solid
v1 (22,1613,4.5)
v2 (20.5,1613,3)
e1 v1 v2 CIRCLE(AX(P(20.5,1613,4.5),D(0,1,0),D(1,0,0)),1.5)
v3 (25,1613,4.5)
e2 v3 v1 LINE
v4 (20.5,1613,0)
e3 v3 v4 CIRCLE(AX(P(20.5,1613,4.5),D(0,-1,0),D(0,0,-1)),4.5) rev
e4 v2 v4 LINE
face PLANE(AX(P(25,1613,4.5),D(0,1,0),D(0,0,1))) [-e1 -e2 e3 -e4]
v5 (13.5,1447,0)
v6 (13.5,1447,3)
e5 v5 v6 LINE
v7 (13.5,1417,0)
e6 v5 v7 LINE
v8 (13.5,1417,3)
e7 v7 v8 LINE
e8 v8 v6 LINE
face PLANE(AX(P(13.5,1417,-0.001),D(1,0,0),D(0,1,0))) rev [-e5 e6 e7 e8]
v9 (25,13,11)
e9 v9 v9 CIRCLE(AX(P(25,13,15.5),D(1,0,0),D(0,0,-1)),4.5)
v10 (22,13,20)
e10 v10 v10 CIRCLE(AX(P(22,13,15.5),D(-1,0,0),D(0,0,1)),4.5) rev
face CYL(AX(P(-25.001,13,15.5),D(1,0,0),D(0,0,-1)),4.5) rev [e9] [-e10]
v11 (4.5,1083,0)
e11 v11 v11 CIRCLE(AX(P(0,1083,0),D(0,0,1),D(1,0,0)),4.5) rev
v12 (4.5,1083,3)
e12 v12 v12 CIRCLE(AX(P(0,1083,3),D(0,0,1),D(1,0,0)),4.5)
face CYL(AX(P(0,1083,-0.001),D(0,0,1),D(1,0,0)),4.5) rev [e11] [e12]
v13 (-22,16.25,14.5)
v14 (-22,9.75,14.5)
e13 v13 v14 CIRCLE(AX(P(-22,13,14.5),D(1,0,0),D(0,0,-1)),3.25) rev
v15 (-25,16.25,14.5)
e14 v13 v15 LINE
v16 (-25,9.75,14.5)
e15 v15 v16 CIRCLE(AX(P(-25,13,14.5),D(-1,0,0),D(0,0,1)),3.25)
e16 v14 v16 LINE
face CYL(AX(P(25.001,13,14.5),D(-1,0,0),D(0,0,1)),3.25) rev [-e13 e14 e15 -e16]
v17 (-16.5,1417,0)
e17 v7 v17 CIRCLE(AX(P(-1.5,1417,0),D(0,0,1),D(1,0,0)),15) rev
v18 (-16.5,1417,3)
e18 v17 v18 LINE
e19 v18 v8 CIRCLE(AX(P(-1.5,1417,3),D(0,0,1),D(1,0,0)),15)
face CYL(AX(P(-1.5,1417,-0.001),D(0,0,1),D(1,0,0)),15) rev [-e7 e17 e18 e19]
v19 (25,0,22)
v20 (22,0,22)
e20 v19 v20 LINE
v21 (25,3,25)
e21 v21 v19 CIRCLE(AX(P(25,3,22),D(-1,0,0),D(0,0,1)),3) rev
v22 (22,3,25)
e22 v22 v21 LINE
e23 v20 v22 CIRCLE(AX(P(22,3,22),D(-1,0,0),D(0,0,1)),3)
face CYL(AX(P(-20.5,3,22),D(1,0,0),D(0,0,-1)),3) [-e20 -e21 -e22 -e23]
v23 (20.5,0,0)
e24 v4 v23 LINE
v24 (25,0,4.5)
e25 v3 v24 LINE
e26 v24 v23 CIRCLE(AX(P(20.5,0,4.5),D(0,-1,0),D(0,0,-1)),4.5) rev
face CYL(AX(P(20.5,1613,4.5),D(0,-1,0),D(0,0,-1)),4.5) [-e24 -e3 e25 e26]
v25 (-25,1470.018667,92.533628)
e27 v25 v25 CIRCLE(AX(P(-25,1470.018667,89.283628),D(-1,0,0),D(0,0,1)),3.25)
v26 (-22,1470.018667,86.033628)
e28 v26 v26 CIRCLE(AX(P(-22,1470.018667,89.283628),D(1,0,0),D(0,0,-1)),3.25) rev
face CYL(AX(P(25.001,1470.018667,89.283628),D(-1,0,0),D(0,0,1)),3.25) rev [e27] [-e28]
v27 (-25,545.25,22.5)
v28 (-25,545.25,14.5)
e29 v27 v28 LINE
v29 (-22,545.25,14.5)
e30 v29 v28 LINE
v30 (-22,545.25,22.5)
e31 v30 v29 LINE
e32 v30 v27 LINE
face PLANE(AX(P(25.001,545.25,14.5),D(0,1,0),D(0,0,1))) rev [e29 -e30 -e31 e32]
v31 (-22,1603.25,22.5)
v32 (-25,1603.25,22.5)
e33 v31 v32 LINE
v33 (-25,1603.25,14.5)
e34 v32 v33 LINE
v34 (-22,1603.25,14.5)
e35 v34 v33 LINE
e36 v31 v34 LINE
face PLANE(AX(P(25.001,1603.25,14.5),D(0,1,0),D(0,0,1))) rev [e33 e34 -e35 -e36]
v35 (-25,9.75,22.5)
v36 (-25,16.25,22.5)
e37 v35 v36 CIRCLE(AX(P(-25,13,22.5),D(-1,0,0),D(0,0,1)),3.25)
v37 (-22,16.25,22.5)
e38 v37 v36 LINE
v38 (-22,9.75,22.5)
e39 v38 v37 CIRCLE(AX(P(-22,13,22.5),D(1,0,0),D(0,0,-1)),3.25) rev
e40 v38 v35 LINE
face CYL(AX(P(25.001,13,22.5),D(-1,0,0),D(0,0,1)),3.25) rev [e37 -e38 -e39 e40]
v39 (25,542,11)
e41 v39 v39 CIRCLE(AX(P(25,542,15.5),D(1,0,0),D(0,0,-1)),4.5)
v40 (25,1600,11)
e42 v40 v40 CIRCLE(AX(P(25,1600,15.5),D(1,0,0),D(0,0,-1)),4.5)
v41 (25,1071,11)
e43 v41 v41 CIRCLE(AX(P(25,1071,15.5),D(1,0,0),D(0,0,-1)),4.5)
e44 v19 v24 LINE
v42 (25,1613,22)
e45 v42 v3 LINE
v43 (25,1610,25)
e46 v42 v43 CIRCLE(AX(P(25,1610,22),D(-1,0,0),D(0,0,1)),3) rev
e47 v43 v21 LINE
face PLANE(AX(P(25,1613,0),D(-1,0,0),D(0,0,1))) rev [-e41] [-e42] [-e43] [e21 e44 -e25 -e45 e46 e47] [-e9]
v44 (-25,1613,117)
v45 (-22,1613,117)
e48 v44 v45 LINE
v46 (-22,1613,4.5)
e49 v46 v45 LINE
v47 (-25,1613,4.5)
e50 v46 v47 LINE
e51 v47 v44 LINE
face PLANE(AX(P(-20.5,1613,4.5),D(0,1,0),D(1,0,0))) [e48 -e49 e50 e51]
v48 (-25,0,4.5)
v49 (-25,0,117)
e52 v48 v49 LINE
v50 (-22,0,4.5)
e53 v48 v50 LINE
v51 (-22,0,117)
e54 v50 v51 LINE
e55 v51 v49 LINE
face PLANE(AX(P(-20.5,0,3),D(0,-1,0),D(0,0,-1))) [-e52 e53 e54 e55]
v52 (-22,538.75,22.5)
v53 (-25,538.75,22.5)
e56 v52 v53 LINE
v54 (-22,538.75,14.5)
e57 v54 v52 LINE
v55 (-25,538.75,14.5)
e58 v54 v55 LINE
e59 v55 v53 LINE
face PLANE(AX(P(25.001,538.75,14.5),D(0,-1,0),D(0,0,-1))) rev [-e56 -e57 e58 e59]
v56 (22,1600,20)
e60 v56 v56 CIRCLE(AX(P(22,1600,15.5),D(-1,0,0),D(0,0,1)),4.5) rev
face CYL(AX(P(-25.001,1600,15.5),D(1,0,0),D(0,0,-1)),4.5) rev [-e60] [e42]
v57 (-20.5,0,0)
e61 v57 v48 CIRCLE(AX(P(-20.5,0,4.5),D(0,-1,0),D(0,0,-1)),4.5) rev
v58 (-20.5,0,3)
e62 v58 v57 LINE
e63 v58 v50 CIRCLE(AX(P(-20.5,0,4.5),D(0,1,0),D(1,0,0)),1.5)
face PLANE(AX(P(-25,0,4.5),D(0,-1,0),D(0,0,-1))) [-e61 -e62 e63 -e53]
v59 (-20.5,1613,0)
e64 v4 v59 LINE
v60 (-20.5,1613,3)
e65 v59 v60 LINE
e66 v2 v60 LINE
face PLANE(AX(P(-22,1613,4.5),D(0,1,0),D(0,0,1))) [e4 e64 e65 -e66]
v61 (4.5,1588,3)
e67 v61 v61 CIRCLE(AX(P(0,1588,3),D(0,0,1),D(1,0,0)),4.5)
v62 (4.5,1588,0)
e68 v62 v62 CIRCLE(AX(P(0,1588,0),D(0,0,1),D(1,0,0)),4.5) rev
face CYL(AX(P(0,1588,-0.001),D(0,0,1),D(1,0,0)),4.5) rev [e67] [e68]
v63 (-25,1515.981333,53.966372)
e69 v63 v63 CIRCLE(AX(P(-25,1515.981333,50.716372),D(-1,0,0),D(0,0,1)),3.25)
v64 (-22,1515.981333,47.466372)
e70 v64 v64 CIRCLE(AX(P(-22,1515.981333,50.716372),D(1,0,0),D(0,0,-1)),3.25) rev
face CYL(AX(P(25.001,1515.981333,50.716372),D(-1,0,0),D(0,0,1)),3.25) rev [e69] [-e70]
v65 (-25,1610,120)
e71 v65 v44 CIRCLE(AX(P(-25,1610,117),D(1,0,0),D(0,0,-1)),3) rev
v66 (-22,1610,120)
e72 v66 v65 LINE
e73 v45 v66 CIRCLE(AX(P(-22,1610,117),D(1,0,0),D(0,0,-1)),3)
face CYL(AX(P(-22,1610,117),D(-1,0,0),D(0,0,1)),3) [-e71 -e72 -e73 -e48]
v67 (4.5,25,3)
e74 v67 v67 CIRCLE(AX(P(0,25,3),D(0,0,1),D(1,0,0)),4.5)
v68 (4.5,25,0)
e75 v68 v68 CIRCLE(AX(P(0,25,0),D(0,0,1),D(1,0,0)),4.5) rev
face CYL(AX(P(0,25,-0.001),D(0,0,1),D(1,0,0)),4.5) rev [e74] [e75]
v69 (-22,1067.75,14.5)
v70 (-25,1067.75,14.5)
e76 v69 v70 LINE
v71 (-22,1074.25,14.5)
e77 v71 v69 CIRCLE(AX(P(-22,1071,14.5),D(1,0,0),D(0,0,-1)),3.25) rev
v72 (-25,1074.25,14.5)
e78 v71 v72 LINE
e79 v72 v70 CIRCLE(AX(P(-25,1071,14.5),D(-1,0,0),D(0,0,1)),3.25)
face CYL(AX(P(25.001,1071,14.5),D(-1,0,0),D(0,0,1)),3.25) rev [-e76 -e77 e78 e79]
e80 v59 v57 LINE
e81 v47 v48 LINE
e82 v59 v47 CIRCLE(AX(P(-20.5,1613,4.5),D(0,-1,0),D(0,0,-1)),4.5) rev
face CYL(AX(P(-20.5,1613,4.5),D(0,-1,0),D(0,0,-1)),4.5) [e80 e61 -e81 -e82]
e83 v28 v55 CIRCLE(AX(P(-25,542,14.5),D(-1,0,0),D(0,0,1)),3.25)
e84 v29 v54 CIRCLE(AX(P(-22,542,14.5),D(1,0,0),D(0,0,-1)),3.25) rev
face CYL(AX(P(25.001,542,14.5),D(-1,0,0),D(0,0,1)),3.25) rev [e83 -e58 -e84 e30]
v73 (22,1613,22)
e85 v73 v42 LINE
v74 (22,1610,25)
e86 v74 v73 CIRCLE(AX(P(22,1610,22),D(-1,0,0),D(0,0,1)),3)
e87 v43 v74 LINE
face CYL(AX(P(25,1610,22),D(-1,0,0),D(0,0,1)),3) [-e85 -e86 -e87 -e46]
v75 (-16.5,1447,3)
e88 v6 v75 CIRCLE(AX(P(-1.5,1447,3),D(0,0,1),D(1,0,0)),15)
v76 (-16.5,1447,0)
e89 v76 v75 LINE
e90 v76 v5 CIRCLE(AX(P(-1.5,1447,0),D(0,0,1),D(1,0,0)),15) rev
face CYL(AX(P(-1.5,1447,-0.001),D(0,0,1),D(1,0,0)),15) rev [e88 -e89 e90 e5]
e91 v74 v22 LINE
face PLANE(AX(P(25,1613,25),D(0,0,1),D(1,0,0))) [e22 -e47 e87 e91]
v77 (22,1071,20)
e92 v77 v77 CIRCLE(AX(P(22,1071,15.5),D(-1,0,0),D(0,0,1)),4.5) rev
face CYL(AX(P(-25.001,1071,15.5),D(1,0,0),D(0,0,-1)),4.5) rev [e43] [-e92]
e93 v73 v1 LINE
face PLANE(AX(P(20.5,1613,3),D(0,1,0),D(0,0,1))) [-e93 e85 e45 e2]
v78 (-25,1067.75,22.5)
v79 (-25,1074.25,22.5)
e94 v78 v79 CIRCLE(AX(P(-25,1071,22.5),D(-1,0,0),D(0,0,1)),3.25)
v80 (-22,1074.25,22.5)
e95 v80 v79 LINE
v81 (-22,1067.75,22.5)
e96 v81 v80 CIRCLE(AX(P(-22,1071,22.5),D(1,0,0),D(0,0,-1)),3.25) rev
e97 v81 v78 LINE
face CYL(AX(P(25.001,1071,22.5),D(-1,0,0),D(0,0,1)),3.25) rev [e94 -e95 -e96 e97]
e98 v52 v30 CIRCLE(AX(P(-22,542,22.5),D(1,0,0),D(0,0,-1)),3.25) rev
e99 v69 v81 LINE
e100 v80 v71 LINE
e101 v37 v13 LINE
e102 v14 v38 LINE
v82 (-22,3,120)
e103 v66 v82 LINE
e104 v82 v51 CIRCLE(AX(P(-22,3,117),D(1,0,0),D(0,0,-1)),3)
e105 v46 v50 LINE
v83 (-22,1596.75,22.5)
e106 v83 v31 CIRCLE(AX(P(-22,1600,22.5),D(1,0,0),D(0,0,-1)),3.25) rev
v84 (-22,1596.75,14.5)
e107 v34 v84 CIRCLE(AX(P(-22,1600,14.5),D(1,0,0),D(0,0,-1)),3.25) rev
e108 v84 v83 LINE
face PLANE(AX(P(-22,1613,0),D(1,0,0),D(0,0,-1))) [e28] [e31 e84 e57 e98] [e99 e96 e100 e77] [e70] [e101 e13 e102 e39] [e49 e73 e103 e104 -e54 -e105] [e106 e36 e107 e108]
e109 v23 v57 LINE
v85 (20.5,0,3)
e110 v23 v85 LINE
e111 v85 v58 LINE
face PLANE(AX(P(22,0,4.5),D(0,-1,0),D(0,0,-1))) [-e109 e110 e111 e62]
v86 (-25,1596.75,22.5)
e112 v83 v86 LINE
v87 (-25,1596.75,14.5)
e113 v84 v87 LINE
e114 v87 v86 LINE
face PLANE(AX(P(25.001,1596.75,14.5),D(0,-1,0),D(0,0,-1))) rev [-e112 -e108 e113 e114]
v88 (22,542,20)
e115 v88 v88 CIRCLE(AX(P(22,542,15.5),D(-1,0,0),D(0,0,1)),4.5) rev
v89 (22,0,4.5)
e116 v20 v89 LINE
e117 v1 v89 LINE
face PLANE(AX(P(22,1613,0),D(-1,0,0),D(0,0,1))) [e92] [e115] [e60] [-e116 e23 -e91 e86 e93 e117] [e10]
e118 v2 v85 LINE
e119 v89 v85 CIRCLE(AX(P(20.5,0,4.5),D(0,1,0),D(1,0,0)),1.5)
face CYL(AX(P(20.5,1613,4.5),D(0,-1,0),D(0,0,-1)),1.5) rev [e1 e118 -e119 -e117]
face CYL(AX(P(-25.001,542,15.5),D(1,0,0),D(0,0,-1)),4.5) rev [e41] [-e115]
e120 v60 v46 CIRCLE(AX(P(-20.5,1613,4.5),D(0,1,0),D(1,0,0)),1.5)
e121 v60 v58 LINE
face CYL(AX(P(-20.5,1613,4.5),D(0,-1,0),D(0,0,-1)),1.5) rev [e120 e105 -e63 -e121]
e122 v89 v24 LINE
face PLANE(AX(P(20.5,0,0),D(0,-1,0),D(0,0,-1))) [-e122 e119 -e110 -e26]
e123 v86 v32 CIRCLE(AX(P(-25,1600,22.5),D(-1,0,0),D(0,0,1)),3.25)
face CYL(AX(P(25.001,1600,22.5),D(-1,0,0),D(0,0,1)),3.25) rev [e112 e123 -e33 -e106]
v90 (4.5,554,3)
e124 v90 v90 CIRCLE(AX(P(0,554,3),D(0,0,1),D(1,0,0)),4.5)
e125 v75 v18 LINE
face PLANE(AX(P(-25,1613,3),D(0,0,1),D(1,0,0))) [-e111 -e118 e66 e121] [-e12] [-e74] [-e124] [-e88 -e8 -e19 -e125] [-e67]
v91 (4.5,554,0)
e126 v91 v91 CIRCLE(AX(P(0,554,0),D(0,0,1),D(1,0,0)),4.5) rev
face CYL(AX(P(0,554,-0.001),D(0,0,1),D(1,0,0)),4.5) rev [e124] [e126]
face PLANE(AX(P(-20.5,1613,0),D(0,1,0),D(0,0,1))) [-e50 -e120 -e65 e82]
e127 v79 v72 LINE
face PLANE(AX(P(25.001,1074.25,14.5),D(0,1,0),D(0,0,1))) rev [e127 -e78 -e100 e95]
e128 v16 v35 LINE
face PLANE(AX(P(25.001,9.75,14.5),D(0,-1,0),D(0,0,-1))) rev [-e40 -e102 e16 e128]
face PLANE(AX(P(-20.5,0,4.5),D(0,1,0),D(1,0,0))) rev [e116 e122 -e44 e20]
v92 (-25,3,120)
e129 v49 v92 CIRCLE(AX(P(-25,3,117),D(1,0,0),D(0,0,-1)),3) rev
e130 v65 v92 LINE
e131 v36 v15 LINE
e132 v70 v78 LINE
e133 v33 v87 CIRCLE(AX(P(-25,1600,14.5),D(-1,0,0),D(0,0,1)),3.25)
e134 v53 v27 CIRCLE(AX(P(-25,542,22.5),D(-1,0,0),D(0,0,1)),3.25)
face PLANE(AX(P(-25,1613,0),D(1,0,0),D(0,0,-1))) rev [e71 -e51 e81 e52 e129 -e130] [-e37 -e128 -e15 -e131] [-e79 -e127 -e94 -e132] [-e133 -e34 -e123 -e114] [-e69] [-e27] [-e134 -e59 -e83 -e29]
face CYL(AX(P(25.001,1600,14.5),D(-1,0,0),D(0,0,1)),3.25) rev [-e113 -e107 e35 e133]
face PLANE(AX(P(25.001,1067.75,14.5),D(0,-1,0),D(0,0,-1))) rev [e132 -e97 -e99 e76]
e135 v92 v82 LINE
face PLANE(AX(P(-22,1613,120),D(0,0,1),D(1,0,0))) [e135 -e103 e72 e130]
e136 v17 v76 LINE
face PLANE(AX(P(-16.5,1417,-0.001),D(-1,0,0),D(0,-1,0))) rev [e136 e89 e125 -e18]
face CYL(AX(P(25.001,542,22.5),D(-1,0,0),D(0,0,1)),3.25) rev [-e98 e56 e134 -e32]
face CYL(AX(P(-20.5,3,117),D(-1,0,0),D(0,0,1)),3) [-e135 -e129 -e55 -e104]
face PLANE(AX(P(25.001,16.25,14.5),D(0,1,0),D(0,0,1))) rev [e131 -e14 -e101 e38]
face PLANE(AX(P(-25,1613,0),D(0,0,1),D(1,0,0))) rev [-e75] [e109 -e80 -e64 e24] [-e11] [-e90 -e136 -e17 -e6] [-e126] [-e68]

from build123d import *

# Parameters (mm, degrees)
BASE_FLANGE1_DEPTH = 1613
CUT_EXTRUDE1_REACH = 1620.23
FILLET1_R          = 3
CUT_EXTRUDE2_REACH = 1620.23
SKETCH7_R          = 4.5
LPATTERN1_COUNT    = 4
LPATTERN1_PITCH    = 529
CUT_EXTRUDE3_REACH = 1620.23
SKETCH8_R          = 3.25
CUT_EXTRUDE4_REACH = 1619.431
CUT_EXTRUDE5_REACH = 1619.431
SKETCH10_R         = 4.5
LPATTERN2_COUNT    = 3
LPATTERN2_PITCH    = 529
CUT_EXTRUDE6_REACH = 1619.431
SKETCH11_R         = 4.5


# Sheet-metal steps are written as plain solids
with BuildPart() as part:
    # Sketch1 → Base-Flange1 (new body)
    with BuildSketch(Plane(origin=(0, 0, 0), x_dir=(1, 0, 0), z_dir=(0, 1, 0))):
        with BuildLine():
            Line((-25, -120), (-25, -4.5))
            ThreePointArc((-25, -4.5), (-23.681980515, -1.318019485), (-20.5, 0))
            Line((-20.5, 0), (20.5, 0))
            ThreePointArc((20.5, 0), (23.681980515, -1.318019485), (25, -4.5))
            Line((25, -4.5), (25, -25))
            Line((25, -25), (22, -25))
            Line((22, -25), (22, -4.5))
            ThreePointArc((22, -4.5), (21.560660172, -3.439339828), (20.5, -3))
            Line((20.5, -3), (-20.5, -3))
            ThreePointArc((-20.5, -3), (-21.560660172, -3.439339828), (-22, -4.5))
            Line((-22, -4.5), (-22, -120))
            Line((-22, -120), (-25, -120))
        make_face()
    extrude(amount=BASE_FLANGE1_DEPTH)

    # Sketch6 → Cut-Extrude1 (cut, up to next)
    with BuildSketch(Plane.ZY.offset(25), mode=Mode.PRIVATE) as cut_extrude1_sk1:
        with BuildLine():
            Line((14.5, 16.25), (22.5, 16.25))
            ThreePointArc((22.5, 16.25), (25.75, 13), (22.5, 9.75))
            Line((22.5, 9.75), (14.5, 9.75))
            ThreePointArc((14.5, 9.75), (11.25, 13), (14.5, 16.25))
        make_face()
    cut_extrude1_tool1 = extrude(cut_extrude1_sk1.sketch, amount=-CUT_EXTRUDE1_REACH, mode=Mode.PRIVATE) & part.part
    cut_extrude1 = cut_extrude1_tool1.solids().sort_by_distance((-25, 13, 18.5))[0]
    add(cut_extrude1, mode=Mode.SUBTRACT)

    # Fillet1
    fillet1_edges = [part.edges().sort_by_distance(p)[0] for p in [
        (23.5, 0, 25),
        (-23.5, 0, 120),
        (23.5, 1613, 25),
        (-23.5, 1613, 120),
    ]]
    fillet(fillet1_edges, radius=FILLET1_R)

    # Sketch7 → Cut-Extrude2 (cut, up to next)
    with BuildSketch(Plane(origin=(25, 0, 0), x_dir=(0, 0, -1), z_dir=(1, 0, 0)), mode=Mode.PRIVATE) as cut_extrude2_sk1:
        with Locations((-15.5, 13)):
            Circle(SKETCH7_R)
    cut_extrude2_tool1 = extrude(cut_extrude2_sk1.sketch, amount=-CUT_EXTRUDE2_REACH, mode=Mode.PRIVATE) & part.part
    cut_extrude2 = cut_extrude2_tool1.solids().sort_by_distance((25, 13, 15.5))[0]
    add(cut_extrude2, mode=Mode.SUBTRACT)

    # LPattern1: Cut-Extrude1, Cut-Extrude2 ×4
    with Locations(*[(0, i * LPATTERN1_PITCH, 0) for i in range(1, LPATTERN1_COUNT)]):
        add(cut_extrude1, mode=Mode.SUBTRACT)
        add(cut_extrude2, mode=Mode.SUBTRACT)

    # Sketch8 → Cut-Extrude3 (cut, up to next)
    with BuildSketch(Plane.ZY.offset(25), mode=Mode.PRIVATE) as cut_extrude3_sk1:
        with Locations((50.716371709, 1515.981333294)):
            Circle(SKETCH8_R)
    cut_extrude3_tool1 = extrude(cut_extrude3_sk1.sketch, amount=-CUT_EXTRUDE3_REACH, mode=Mode.PRIVATE) & part.part
    # Sketch8 → Cut-Extrude3 (cut, up to next)
    with BuildSketch(Plane.ZY.offset(25), mode=Mode.PRIVATE) as cut_extrude3_sk2:
        with Locations((89.283628291, 1470.018666706)):
            Circle(SKETCH8_R)
    cut_extrude3_tool2 = extrude(cut_extrude3_sk2.sketch, amount=-CUT_EXTRUDE3_REACH, mode=Mode.PRIVATE) & part.part
    add(cut_extrude3_tool1.solids().sort_by_distance((-25, 1515.981333, 50.716372))[0], mode=Mode.SUBTRACT)
    add(cut_extrude3_tool2.solids().sort_by_distance((-25, 1470.018667, 89.283628))[0], mode=Mode.SUBTRACT)

    # Sketch9 → Cut-Extrude4 (cut, up to next)
    with BuildSketch(Plane.XY.offset(3), mode=Mode.PRIVATE) as cut_extrude4_sk1:
        with BuildLine():
            Line((-16.5, 1417), (-16.5, 1447))
            ThreePointArc((-16.5, 1447), (-1.5, 1462), (13.5, 1447))
            Line((13.5, 1447), (13.5, 1417))
            ThreePointArc((13.5, 1417), (-1.5, 1402), (-16.5, 1417))
        make_face()
    cut_extrude4_tool1 = extrude(cut_extrude4_sk1.sketch, amount=-CUT_EXTRUDE4_REACH, mode=Mode.PRIVATE) & part.part
    add(cut_extrude4_tool1.solids().sort_by_distance((-1.5, 1432, 3))[0], mode=Mode.SUBTRACT)

    # Sketch10 → Cut-Extrude5 (cut, up to next)
    with BuildSketch(Plane.XY.offset(3), mode=Mode.PRIVATE) as cut_extrude5_sk1:
        with Locations((0, 25)):
            Circle(SKETCH10_R)
    cut_extrude5_tool1 = extrude(cut_extrude5_sk1.sketch, amount=-CUT_EXTRUDE5_REACH, mode=Mode.PRIVATE) & part.part
    cut_extrude5 = cut_extrude5_tool1.solids().sort_by_distance((0, 25, 3))[0]
    add(cut_extrude5, mode=Mode.SUBTRACT)

    # LPattern2: Cut-Extrude5 ×3
    with Locations(*[(0, i * LPATTERN2_PITCH, 0) for i in range(1, LPATTERN2_COUNT)]):
        add(cut_extrude5, mode=Mode.SUBTRACT)

    # Sketch11 → Cut-Extrude6 (cut, up to next)
    with BuildSketch(Plane.XY.offset(3), mode=Mode.PRIVATE) as cut_extrude6_sk1:
        with Locations((0, 1588)):
            Circle(SKETCH11_R)
    cut_extrude6_tool1 = extrude(cut_extrude6_sk1.sketch, amount=-CUT_EXTRUDE6_REACH, mode=Mode.PRIVATE) & part.part
    add(cut_extrude6_tool1.solids().sort_by_distance((0, 1588, 3))[0], mode=Mode.SUBTRACT)


solid = part.part
